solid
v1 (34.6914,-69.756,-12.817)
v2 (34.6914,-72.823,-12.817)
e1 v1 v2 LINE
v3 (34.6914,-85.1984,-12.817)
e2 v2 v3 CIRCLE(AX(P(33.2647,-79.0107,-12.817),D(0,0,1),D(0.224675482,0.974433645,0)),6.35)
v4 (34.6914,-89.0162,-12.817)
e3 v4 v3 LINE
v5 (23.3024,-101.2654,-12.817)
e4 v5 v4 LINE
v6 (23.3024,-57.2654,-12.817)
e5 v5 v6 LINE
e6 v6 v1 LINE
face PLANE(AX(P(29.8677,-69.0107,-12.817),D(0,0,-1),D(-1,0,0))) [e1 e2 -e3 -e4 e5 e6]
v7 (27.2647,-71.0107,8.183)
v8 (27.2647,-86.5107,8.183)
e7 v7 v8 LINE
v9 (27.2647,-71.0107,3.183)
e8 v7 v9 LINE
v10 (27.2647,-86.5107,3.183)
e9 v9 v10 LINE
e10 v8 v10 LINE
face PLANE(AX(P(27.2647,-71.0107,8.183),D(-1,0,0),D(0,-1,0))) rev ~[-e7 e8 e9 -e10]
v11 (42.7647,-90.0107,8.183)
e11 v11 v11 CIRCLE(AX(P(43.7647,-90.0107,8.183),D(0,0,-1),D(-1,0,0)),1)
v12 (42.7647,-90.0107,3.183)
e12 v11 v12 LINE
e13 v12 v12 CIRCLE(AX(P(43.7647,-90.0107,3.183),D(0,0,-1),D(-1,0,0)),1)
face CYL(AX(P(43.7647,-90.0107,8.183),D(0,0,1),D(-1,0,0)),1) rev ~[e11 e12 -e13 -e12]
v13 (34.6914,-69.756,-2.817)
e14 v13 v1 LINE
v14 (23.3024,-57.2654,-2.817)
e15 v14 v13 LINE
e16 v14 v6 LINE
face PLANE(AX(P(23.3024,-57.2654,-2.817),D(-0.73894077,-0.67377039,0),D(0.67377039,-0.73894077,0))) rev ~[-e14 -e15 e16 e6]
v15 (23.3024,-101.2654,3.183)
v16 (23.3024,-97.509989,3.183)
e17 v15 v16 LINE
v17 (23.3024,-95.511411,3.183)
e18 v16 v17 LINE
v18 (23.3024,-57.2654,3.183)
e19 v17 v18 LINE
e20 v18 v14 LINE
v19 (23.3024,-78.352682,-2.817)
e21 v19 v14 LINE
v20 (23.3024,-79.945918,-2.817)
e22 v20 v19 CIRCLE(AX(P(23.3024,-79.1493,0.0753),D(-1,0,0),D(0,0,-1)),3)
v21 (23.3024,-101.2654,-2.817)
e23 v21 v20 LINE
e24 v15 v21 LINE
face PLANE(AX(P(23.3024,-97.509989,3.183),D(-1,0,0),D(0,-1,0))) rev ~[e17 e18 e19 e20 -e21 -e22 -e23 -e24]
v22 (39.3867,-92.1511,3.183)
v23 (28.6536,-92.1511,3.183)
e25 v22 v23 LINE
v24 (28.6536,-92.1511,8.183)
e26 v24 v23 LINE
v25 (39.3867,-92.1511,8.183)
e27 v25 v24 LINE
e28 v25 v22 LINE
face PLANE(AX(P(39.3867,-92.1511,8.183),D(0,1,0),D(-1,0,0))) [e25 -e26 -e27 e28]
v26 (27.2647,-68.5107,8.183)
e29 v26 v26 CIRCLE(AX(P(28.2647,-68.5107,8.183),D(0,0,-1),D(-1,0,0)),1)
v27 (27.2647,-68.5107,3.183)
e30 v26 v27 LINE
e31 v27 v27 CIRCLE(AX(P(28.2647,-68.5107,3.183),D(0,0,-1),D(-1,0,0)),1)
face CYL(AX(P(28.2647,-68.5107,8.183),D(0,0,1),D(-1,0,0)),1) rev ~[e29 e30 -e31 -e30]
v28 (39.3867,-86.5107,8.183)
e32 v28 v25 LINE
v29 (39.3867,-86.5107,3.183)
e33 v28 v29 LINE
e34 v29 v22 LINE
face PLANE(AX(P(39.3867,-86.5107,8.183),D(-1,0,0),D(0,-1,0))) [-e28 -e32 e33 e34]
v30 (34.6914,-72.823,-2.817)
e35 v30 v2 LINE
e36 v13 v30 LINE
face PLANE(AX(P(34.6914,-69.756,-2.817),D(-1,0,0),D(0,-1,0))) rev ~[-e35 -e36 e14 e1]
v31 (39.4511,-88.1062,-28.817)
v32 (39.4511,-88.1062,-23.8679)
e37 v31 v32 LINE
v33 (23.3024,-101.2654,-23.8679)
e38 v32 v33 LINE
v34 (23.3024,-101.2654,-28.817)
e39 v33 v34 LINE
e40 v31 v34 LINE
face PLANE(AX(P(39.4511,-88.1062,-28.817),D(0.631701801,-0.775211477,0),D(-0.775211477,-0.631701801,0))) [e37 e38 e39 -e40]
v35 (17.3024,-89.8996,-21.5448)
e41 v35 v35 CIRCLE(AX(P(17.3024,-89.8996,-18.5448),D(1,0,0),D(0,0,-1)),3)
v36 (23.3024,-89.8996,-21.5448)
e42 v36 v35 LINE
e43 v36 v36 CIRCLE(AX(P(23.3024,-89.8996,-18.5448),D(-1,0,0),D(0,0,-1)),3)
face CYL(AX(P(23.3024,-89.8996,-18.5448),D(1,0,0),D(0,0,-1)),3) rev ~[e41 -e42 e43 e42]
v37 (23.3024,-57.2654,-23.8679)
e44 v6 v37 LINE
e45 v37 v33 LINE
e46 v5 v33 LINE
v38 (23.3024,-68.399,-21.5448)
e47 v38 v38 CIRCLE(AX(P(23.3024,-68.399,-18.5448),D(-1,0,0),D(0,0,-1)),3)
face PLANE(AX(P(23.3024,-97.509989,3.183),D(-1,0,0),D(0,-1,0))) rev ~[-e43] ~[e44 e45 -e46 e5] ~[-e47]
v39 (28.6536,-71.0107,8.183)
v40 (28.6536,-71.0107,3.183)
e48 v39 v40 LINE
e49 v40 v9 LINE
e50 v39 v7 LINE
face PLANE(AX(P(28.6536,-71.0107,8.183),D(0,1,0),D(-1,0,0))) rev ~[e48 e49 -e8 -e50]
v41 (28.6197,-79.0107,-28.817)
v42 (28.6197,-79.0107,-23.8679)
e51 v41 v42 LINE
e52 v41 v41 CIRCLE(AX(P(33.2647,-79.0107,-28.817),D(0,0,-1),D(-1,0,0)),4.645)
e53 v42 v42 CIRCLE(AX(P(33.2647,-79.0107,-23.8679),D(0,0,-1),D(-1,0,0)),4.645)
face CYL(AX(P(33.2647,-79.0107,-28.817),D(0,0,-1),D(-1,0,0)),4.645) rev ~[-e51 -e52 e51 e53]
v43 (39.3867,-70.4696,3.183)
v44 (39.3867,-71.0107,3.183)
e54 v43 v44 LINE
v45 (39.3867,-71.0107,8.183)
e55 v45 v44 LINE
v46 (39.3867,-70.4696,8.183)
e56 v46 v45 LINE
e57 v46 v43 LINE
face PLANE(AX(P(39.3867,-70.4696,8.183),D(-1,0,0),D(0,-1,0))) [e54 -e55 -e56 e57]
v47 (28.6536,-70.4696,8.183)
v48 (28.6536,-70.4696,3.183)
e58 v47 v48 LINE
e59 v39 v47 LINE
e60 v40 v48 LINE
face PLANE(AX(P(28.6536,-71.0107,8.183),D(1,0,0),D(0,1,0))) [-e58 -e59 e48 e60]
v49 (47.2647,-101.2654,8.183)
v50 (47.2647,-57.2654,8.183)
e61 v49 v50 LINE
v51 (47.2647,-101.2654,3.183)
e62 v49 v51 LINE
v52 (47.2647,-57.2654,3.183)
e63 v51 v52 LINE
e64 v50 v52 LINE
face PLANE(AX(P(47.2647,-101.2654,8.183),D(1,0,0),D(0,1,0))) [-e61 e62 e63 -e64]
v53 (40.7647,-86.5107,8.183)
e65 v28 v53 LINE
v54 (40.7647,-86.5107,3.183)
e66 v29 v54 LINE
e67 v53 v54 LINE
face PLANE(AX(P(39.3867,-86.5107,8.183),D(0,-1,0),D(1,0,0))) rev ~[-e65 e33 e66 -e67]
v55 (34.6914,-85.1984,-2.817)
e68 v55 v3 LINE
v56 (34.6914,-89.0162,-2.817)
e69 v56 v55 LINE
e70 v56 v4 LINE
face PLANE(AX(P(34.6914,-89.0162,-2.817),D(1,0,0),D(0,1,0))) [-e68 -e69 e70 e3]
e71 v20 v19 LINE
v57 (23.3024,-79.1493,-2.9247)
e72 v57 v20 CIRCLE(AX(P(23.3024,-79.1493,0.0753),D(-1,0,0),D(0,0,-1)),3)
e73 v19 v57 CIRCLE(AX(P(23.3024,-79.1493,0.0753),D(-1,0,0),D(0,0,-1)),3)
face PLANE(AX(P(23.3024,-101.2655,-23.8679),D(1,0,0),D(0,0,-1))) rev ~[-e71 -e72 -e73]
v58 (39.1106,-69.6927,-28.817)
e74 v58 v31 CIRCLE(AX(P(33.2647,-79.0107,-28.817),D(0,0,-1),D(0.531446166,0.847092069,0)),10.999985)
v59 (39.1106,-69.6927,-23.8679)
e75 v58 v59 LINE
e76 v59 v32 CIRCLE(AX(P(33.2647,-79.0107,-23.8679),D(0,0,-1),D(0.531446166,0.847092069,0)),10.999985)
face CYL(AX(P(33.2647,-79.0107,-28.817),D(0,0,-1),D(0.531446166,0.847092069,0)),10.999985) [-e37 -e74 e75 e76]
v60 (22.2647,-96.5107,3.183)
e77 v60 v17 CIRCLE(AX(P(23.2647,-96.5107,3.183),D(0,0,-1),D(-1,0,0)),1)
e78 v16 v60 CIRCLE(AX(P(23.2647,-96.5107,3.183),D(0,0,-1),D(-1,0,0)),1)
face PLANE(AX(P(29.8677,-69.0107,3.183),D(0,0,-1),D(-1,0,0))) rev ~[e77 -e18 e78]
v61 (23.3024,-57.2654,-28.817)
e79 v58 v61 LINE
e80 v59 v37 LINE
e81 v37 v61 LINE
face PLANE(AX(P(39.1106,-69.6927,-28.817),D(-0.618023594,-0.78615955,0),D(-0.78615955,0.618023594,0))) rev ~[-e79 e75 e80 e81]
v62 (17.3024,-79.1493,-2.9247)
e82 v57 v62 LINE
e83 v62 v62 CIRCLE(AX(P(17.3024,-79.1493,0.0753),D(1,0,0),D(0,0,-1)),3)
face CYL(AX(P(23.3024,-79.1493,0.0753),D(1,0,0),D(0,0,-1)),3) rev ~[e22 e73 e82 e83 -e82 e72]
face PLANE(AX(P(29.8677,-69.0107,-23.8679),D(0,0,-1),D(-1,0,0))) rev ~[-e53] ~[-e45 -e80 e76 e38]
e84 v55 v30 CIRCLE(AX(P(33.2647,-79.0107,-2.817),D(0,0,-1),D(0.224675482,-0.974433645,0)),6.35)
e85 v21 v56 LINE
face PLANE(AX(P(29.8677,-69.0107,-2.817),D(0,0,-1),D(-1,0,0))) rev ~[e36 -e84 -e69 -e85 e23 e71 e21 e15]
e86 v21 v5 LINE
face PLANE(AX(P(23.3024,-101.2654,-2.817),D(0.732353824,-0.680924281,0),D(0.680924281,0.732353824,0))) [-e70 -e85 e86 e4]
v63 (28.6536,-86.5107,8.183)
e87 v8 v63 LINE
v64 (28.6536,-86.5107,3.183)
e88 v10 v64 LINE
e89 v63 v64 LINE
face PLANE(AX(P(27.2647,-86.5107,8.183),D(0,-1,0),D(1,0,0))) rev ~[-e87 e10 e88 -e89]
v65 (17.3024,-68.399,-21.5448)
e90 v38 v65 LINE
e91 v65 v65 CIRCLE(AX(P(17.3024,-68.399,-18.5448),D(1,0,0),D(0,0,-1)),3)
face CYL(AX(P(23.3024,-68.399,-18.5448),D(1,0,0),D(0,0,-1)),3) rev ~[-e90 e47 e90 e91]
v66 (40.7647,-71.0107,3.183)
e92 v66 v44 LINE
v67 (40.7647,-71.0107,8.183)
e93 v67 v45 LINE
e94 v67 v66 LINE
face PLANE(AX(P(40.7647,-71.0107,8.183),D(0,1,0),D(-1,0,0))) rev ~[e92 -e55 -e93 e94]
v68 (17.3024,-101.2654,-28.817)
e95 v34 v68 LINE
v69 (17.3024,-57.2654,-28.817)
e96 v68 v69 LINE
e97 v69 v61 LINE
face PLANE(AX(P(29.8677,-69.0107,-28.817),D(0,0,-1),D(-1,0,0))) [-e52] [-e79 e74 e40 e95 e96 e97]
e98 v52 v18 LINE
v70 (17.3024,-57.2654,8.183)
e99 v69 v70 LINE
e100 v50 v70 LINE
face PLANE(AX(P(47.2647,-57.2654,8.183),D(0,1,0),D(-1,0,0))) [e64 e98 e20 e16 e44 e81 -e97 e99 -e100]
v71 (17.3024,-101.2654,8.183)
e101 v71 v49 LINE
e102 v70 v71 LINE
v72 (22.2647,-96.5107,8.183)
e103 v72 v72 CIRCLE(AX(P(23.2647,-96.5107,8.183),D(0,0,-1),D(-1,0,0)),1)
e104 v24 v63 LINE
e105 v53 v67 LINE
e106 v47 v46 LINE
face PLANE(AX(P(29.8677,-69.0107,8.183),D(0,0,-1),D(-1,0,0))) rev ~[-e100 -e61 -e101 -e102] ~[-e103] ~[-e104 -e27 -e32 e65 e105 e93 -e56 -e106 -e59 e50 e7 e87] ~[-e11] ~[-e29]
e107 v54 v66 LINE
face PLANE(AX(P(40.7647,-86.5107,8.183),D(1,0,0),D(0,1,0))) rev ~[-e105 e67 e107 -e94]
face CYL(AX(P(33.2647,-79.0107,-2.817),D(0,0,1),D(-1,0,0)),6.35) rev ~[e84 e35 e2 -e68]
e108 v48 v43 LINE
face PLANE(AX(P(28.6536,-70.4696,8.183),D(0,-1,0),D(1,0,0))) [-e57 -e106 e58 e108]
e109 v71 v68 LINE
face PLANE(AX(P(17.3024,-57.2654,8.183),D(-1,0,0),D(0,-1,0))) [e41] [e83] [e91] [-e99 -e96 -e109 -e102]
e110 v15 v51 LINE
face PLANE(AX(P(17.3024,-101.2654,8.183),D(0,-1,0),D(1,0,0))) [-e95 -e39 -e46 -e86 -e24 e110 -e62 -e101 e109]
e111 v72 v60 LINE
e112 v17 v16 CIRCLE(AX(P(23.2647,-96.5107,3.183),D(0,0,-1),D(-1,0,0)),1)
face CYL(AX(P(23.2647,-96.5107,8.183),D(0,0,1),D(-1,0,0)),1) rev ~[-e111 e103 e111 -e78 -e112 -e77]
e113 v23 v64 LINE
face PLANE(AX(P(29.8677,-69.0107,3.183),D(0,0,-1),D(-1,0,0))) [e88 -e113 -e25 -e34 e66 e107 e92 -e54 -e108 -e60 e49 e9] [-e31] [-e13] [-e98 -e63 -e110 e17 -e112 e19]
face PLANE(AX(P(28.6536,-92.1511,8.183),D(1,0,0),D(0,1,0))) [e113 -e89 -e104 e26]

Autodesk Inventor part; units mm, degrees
ref_plane "YZ Plane" through (0, 0, 0) normal (1, 0, 0) x (0, 1, 0)
ref_plane "XZ Plane" through (0, 0, 0) normal (0, 1, 0) x (-1, 0, 0)
ref_plane "Work Plane1" through (29.8677, -69.0107, 8.183) normal (0, 0, -1) x (-1, 0, 0)
sketch "Sketch1" plane through (29.8677, -69.0107, 8.183) normal (0, 0, -1) x (-1, 0, 0)
  line L0 (2.603, -2) -> (2.603, -17.5) projected
  line L1 (2.603, -17.5) -> (-10.897, -17.5) projected
  line L2 (-10.897, -17.5) -> (-10.897, -2) projected
  line L3 (-10.897, -2) -> (2.603, -2) projected
  circle A0 centre (6.603, -27.5) radius 1 projected
  circle A1 centre (-13.897, -21) radius 1 projected
  circle A2 centre (1.603, 0.5) radius 1 projected
  arc A3 (9.303, -26.8555) -> (8.303, -25.8555) centre (8.303, -26.8555) ccw projected
  line L4 (8.303, -25.8555) -> (5.5653, -25.8555) projected
  arc A4 (4.5653, -24.8555) -> (5.5653, -25.8555) centre (5.5653, -24.8555) ccw projected
  line L5 (4.5653, -24.8555) -> (4.5653, 2) projected
  arc A5 (4.5653, 2) -> (3.5653, 3) centre (3.5653, 2) ccw projected
  line L6 (3.5653, 3) -> (1, 3) projected
  arc A6 (1, 3) -> (0, 2) centre (1, 2) ccw projected
  line L7 (0, 2) -> (0, 1) projected
  arc A7 (-1, 0) -> (0, 1) centre (-1, 1) ccw projected
  line L8 (-1, 0) -> (-12.5347, 0) projected
  line L9 (-12.5347, 0) -> (-12.5347, -18.4723) projected
  arc A8 (-13.5347, -19.4723) -> (-12.5347, -18.4723) centre (-13.5347, -18.4723) ccw projected
  line L10 (-13.5347, -19.4723) -> (-15.397, -19.4723) projected
  arc A9 (-15.397, -19.4723) -> (-16.397, -20.4723) centre (-15.397, -20.4723) ccw projected
  line L11 (-16.397, -20.4723) -> (-16.397, -30) projected
  line L12 (-16.397, -30) -> (9.303, -30) projected
  line L13 (9.303, -30) -> (9.303, -26.8555) projected
  line L14 (-17.397, 11.7453) -> (12.5653, 11.7453)
  line L15 (12.5653, 11.7453) -> (12.5653, -32.2547)
  line L16 (12.5653, -32.2547) -> (-17.397, -32.2547)
  line L17 (-17.397, -32.2547) -> (-17.397, 11.7453)
  line L18 (1.2141, -1.4589) -> (-9.519, -1.4589)
  line L19 (-9.519, -1.4589) -> (-9.519, -23.1404)
  line L20 (-9.519, -23.1404) -> (1.2141, -23.1404)
  line L21 (1.2141, -23.1404) -> (1.2141, -1.4589)
  ellipse E0 centre (-3.397, -10.2547) end of major axis (-6.4323, -10.2547) minor radius 3.0277 projected
  point P0 (29.8677, 69.0107)
  dimension "d0" = 8
  dimension "d1" = 1
  dimension "d13" = 22
  dimension "d14" = 22
extrude "Extrusion1" add sketch "Sketch1" along normal blind 5 contours L13 L12 L11 A9 L10 A8 L9 L8 A7 L7 A6 L6 A5 L5 A4 L4 A3 | L14 L15 L16 L17
sketch "Sketch2" plane through (29.8677, -69.0107, 3.183) normal (0, 0, -1) x (-1, 0, 0)
  line L0 (12.5653, 11.7453) -> (-17.397, 11.7453) projected
  line L1 (-17.397, 11.7453) -> (-17.397, -32.2547) projected
  line L2 (-17.397, -32.2547) -> (12.5653, -32.2547) projected
  line L3 (12.5653, -32.2547) -> (12.5653, 11.7453) projected
  circle A0 centre (6.603, -27.5) radius 1 projected
  circle A1 centre (-13.897, -21) radius 1 projected
  circle A2 centre (1.603, 0.5) radius 1 projected
  line L4 (1.2141, -17.5) -> (1.2141, -23.1404) projected
  line L5 (1.2141, -23.1404) -> (-9.519, -23.1404) projected
  line L6 (-9.519, -23.1404) -> (-9.519, -17.5) projected
  line L7 (-9.519, -17.5) -> (-10.897, -17.5) projected
  line L8 (-10.897, -17.5) -> (-10.897, -2) projected
  line L9 (-10.897, -2) -> (-9.519, -2) projected
  line L10 (-9.519, -2) -> (-9.519, -1.4589) projected
  line L11 (-9.519, -1.4589) -> (1.2141, -1.4589) projected
  line L12 (1.2141, -1.4589) -> (1.2141, -2) projected
  line L13 (1.2141, -2) -> (2.603, -2) projected
  line L14 (2.603, -2) -> (2.603, -17.5) projected
  line L15 (2.603, -17.5) -> (1.2141, -17.5) projected
  line L16 (-17.397, 11.7453) -> (12.5653, 11.7453) projected
  line L17 (12.5653, -32.2547) -> (-17.397, -32.2547) projected
  line L18 (12.5653, 11.7453) -> (6.5653, 11.7453)
  line L19 (6.5653, 11.7453) -> (6.5653, -32.2547)
  line L20 (6.5653, -32.2547) -> (12.5653, -32.2547)
  line L21 (12.5653, -32.2547) -> (12.5653, 11.7453)
  point P0 (29.8677, 69.0107)
  dimension "d6" = 6
extrude "Extrusion2" add sketch "Sketch2" along normal blind 32 contours L3 L2 L19 A0 L0 | A0 L19 picked at (6.9324, -27.235)
sketch "Sketch3" plane through (29.8677, -69.0107, -28.817) normal (0, 0, -1) x (-1, 0, 0)
  circle A0 centre (-3.397, -10) radius 4.445 projected
  circle A1 centre (-3.397, -10) radius 4.645
  line L0 (12.5653, 11.7453) -> (12.5653, -32.2547) projected
  line L1 (12.5653, -32.2547) -> (12.5653, 11.7453) projected
  line L2 (12.5653, 11.7453) -> (6.5653, 11.7453) projected
  line L3 (6.5653, 11.7453) -> (6.5653, -32.2547) projected
  line L4 (6.5653, -32.2547) -> (12.5653, -32.2547) projected
  line L5 (12.5653, -32.2547) -> (12.5653, 11.7453) projected
  line L6 (6.5653, 11.7453) -> (-17.397, 11.7453) projected
  line L7 (-9.2429, -0.682) -> (6.5653, 11.7453)
  line L8 (-9.5834, -19.0955) -> (6.5653, -32.2547)
  line L9 (6.5653, 11.7453) -> (6.5653, -5.3362)
  line L10 (6.5653, -14.6638) -> (6.5653, -32.2547)
  arc A2 (-9.2429, -0.682) -> (-9.5834, -19.0955) centre (-3.397, -10) ccw
  arc A3 (6.5653, -14.6638) -> (6.5653, -5.3362) centre (-3.397, -10) ccw
  point P0 (29.8677, 69.0107)
  dimension "d9" = 0.2
ref_plane "Work Plane2" through (26.9102, -85.3653, -23.8679) normal (0, 0, -1) x (0, 1, 0)
extrude "Extrusion3" add sketch "Sketch3" against normal up to surface (4.9491 mm away) contours L0 L4 L3 A3 L2 | L3 L8 A2 L7 | A3 L3
ref_plane "Work Plane3" through (29.8677, -69.0107, -2.817) normal (0, 0, -1) x (-1, 0, 0)
sketch "Sketch4" plane through (29.8677, -69.0107, -2.817) normal (0, 0, -1) x (-1, 0, 0)
  circle A0 centre (-3.397, -10) radius 6.35 projected
  line L0 (6.5653, -32.2547) -> (6.5653, 11.7453) projected
  line L1 (6.5653, -32.2547) -> (-4.8237, -20.0055)
  line L2 (-4.8237, -20.0055) -> (-4.8237, -16.1877)
  line L3 (12.5653, -32.2547) -> (-17.397, -32.2547) projected
  line L4 (6.5653, 11.7453) -> (-4.8237, -0.7453)
  line L5 (-4.8237, -0.7453) -> (-4.8237, -3.8123)
  point P0 (29.8677, 69.0107)
extrude "Extrusion4" add sketch "Sketch4" along normal blind 10 contours A0 L5 L4 L0 L1 L2
sketch "Sketch5" plane through (23.3024, -101.2655, -23.8679) normal (1, 0, 0) x (0, 0, -1)
  line L0 (-21.0509, 0) -> (-21.0509, 44) projected
  line L1 (-27.0509, 44) -> (-21.0509, 44) projected
  line L2 (-27.0509, 0) -> (-27.0509, 3.7554) projected
  line L3 (-27.0509, 0) -> (-21.0509, 0) projected
  line L4 (-11.0509, 44) -> (-11.0509, 0) projected
  line L5 (-11.0509, 0) -> (0, 0) projected
  line L6 (-11.0509, 44) -> (0, 44) projected
  line L7 (-5.3231, 32.8665) -> (-5.3231, 11.3659)
  line L8 (-5.3231, 11.3659) -> (-23.9432, 22.1162)
  line L9 (-23.9432, 22.1162) -> (-5.3231, 32.8665)
  circle A0 centre (-23.9432, 22.1162) radius 3
  circle A1 centre (-5.3231, 32.8665) radius 3
  circle A2 centre (-5.3231, 11.3659) radius 3
  line L10 (-27.0509, 0) -> (-21.0509, 0) projected
  line L11 (-27.0509, 44) -> (-21.0509, 44) projected
  line L12 (-21.0509, 0) -> (-21.0509, 44) projected
  line L13 (-27.0509, 5.754) -> (-27.0509, 44) projected
  line L14 (-27.0509, 5.754) -> (-27.0509, 3.7554) projected
  line L15 (-27.0509, 0) -> (-27.0509, 3.7554) projected
  line L16 (-27.0509, 5.754) -> (-27.0509, 44) projected
  line L17 (-27.0509, 5.754) -> (-27.0509, 3.7554) projected
  line L18 (0, 0) -> (0, 44) projected
  point P0 (-23.8679, 101.2655)
  point P1 (-11.5298, 22.1162)
  dimension "d18" = 0
  dimension "d19" = 6
  dimension "d20" = 6
  dimension "d21" = 6
extrude "Extrusion5" cut sketch "Sketch5" against normal blind 10 contours A0 L8 L9 L0 | L0 A0 | A0 L9 L8 | A2 L7 L8 | L8 L7 A2 | A1 L7 L9 | L9 L7 A1
properties part number "30_cellSTORM_fiberbase_base_v3"
